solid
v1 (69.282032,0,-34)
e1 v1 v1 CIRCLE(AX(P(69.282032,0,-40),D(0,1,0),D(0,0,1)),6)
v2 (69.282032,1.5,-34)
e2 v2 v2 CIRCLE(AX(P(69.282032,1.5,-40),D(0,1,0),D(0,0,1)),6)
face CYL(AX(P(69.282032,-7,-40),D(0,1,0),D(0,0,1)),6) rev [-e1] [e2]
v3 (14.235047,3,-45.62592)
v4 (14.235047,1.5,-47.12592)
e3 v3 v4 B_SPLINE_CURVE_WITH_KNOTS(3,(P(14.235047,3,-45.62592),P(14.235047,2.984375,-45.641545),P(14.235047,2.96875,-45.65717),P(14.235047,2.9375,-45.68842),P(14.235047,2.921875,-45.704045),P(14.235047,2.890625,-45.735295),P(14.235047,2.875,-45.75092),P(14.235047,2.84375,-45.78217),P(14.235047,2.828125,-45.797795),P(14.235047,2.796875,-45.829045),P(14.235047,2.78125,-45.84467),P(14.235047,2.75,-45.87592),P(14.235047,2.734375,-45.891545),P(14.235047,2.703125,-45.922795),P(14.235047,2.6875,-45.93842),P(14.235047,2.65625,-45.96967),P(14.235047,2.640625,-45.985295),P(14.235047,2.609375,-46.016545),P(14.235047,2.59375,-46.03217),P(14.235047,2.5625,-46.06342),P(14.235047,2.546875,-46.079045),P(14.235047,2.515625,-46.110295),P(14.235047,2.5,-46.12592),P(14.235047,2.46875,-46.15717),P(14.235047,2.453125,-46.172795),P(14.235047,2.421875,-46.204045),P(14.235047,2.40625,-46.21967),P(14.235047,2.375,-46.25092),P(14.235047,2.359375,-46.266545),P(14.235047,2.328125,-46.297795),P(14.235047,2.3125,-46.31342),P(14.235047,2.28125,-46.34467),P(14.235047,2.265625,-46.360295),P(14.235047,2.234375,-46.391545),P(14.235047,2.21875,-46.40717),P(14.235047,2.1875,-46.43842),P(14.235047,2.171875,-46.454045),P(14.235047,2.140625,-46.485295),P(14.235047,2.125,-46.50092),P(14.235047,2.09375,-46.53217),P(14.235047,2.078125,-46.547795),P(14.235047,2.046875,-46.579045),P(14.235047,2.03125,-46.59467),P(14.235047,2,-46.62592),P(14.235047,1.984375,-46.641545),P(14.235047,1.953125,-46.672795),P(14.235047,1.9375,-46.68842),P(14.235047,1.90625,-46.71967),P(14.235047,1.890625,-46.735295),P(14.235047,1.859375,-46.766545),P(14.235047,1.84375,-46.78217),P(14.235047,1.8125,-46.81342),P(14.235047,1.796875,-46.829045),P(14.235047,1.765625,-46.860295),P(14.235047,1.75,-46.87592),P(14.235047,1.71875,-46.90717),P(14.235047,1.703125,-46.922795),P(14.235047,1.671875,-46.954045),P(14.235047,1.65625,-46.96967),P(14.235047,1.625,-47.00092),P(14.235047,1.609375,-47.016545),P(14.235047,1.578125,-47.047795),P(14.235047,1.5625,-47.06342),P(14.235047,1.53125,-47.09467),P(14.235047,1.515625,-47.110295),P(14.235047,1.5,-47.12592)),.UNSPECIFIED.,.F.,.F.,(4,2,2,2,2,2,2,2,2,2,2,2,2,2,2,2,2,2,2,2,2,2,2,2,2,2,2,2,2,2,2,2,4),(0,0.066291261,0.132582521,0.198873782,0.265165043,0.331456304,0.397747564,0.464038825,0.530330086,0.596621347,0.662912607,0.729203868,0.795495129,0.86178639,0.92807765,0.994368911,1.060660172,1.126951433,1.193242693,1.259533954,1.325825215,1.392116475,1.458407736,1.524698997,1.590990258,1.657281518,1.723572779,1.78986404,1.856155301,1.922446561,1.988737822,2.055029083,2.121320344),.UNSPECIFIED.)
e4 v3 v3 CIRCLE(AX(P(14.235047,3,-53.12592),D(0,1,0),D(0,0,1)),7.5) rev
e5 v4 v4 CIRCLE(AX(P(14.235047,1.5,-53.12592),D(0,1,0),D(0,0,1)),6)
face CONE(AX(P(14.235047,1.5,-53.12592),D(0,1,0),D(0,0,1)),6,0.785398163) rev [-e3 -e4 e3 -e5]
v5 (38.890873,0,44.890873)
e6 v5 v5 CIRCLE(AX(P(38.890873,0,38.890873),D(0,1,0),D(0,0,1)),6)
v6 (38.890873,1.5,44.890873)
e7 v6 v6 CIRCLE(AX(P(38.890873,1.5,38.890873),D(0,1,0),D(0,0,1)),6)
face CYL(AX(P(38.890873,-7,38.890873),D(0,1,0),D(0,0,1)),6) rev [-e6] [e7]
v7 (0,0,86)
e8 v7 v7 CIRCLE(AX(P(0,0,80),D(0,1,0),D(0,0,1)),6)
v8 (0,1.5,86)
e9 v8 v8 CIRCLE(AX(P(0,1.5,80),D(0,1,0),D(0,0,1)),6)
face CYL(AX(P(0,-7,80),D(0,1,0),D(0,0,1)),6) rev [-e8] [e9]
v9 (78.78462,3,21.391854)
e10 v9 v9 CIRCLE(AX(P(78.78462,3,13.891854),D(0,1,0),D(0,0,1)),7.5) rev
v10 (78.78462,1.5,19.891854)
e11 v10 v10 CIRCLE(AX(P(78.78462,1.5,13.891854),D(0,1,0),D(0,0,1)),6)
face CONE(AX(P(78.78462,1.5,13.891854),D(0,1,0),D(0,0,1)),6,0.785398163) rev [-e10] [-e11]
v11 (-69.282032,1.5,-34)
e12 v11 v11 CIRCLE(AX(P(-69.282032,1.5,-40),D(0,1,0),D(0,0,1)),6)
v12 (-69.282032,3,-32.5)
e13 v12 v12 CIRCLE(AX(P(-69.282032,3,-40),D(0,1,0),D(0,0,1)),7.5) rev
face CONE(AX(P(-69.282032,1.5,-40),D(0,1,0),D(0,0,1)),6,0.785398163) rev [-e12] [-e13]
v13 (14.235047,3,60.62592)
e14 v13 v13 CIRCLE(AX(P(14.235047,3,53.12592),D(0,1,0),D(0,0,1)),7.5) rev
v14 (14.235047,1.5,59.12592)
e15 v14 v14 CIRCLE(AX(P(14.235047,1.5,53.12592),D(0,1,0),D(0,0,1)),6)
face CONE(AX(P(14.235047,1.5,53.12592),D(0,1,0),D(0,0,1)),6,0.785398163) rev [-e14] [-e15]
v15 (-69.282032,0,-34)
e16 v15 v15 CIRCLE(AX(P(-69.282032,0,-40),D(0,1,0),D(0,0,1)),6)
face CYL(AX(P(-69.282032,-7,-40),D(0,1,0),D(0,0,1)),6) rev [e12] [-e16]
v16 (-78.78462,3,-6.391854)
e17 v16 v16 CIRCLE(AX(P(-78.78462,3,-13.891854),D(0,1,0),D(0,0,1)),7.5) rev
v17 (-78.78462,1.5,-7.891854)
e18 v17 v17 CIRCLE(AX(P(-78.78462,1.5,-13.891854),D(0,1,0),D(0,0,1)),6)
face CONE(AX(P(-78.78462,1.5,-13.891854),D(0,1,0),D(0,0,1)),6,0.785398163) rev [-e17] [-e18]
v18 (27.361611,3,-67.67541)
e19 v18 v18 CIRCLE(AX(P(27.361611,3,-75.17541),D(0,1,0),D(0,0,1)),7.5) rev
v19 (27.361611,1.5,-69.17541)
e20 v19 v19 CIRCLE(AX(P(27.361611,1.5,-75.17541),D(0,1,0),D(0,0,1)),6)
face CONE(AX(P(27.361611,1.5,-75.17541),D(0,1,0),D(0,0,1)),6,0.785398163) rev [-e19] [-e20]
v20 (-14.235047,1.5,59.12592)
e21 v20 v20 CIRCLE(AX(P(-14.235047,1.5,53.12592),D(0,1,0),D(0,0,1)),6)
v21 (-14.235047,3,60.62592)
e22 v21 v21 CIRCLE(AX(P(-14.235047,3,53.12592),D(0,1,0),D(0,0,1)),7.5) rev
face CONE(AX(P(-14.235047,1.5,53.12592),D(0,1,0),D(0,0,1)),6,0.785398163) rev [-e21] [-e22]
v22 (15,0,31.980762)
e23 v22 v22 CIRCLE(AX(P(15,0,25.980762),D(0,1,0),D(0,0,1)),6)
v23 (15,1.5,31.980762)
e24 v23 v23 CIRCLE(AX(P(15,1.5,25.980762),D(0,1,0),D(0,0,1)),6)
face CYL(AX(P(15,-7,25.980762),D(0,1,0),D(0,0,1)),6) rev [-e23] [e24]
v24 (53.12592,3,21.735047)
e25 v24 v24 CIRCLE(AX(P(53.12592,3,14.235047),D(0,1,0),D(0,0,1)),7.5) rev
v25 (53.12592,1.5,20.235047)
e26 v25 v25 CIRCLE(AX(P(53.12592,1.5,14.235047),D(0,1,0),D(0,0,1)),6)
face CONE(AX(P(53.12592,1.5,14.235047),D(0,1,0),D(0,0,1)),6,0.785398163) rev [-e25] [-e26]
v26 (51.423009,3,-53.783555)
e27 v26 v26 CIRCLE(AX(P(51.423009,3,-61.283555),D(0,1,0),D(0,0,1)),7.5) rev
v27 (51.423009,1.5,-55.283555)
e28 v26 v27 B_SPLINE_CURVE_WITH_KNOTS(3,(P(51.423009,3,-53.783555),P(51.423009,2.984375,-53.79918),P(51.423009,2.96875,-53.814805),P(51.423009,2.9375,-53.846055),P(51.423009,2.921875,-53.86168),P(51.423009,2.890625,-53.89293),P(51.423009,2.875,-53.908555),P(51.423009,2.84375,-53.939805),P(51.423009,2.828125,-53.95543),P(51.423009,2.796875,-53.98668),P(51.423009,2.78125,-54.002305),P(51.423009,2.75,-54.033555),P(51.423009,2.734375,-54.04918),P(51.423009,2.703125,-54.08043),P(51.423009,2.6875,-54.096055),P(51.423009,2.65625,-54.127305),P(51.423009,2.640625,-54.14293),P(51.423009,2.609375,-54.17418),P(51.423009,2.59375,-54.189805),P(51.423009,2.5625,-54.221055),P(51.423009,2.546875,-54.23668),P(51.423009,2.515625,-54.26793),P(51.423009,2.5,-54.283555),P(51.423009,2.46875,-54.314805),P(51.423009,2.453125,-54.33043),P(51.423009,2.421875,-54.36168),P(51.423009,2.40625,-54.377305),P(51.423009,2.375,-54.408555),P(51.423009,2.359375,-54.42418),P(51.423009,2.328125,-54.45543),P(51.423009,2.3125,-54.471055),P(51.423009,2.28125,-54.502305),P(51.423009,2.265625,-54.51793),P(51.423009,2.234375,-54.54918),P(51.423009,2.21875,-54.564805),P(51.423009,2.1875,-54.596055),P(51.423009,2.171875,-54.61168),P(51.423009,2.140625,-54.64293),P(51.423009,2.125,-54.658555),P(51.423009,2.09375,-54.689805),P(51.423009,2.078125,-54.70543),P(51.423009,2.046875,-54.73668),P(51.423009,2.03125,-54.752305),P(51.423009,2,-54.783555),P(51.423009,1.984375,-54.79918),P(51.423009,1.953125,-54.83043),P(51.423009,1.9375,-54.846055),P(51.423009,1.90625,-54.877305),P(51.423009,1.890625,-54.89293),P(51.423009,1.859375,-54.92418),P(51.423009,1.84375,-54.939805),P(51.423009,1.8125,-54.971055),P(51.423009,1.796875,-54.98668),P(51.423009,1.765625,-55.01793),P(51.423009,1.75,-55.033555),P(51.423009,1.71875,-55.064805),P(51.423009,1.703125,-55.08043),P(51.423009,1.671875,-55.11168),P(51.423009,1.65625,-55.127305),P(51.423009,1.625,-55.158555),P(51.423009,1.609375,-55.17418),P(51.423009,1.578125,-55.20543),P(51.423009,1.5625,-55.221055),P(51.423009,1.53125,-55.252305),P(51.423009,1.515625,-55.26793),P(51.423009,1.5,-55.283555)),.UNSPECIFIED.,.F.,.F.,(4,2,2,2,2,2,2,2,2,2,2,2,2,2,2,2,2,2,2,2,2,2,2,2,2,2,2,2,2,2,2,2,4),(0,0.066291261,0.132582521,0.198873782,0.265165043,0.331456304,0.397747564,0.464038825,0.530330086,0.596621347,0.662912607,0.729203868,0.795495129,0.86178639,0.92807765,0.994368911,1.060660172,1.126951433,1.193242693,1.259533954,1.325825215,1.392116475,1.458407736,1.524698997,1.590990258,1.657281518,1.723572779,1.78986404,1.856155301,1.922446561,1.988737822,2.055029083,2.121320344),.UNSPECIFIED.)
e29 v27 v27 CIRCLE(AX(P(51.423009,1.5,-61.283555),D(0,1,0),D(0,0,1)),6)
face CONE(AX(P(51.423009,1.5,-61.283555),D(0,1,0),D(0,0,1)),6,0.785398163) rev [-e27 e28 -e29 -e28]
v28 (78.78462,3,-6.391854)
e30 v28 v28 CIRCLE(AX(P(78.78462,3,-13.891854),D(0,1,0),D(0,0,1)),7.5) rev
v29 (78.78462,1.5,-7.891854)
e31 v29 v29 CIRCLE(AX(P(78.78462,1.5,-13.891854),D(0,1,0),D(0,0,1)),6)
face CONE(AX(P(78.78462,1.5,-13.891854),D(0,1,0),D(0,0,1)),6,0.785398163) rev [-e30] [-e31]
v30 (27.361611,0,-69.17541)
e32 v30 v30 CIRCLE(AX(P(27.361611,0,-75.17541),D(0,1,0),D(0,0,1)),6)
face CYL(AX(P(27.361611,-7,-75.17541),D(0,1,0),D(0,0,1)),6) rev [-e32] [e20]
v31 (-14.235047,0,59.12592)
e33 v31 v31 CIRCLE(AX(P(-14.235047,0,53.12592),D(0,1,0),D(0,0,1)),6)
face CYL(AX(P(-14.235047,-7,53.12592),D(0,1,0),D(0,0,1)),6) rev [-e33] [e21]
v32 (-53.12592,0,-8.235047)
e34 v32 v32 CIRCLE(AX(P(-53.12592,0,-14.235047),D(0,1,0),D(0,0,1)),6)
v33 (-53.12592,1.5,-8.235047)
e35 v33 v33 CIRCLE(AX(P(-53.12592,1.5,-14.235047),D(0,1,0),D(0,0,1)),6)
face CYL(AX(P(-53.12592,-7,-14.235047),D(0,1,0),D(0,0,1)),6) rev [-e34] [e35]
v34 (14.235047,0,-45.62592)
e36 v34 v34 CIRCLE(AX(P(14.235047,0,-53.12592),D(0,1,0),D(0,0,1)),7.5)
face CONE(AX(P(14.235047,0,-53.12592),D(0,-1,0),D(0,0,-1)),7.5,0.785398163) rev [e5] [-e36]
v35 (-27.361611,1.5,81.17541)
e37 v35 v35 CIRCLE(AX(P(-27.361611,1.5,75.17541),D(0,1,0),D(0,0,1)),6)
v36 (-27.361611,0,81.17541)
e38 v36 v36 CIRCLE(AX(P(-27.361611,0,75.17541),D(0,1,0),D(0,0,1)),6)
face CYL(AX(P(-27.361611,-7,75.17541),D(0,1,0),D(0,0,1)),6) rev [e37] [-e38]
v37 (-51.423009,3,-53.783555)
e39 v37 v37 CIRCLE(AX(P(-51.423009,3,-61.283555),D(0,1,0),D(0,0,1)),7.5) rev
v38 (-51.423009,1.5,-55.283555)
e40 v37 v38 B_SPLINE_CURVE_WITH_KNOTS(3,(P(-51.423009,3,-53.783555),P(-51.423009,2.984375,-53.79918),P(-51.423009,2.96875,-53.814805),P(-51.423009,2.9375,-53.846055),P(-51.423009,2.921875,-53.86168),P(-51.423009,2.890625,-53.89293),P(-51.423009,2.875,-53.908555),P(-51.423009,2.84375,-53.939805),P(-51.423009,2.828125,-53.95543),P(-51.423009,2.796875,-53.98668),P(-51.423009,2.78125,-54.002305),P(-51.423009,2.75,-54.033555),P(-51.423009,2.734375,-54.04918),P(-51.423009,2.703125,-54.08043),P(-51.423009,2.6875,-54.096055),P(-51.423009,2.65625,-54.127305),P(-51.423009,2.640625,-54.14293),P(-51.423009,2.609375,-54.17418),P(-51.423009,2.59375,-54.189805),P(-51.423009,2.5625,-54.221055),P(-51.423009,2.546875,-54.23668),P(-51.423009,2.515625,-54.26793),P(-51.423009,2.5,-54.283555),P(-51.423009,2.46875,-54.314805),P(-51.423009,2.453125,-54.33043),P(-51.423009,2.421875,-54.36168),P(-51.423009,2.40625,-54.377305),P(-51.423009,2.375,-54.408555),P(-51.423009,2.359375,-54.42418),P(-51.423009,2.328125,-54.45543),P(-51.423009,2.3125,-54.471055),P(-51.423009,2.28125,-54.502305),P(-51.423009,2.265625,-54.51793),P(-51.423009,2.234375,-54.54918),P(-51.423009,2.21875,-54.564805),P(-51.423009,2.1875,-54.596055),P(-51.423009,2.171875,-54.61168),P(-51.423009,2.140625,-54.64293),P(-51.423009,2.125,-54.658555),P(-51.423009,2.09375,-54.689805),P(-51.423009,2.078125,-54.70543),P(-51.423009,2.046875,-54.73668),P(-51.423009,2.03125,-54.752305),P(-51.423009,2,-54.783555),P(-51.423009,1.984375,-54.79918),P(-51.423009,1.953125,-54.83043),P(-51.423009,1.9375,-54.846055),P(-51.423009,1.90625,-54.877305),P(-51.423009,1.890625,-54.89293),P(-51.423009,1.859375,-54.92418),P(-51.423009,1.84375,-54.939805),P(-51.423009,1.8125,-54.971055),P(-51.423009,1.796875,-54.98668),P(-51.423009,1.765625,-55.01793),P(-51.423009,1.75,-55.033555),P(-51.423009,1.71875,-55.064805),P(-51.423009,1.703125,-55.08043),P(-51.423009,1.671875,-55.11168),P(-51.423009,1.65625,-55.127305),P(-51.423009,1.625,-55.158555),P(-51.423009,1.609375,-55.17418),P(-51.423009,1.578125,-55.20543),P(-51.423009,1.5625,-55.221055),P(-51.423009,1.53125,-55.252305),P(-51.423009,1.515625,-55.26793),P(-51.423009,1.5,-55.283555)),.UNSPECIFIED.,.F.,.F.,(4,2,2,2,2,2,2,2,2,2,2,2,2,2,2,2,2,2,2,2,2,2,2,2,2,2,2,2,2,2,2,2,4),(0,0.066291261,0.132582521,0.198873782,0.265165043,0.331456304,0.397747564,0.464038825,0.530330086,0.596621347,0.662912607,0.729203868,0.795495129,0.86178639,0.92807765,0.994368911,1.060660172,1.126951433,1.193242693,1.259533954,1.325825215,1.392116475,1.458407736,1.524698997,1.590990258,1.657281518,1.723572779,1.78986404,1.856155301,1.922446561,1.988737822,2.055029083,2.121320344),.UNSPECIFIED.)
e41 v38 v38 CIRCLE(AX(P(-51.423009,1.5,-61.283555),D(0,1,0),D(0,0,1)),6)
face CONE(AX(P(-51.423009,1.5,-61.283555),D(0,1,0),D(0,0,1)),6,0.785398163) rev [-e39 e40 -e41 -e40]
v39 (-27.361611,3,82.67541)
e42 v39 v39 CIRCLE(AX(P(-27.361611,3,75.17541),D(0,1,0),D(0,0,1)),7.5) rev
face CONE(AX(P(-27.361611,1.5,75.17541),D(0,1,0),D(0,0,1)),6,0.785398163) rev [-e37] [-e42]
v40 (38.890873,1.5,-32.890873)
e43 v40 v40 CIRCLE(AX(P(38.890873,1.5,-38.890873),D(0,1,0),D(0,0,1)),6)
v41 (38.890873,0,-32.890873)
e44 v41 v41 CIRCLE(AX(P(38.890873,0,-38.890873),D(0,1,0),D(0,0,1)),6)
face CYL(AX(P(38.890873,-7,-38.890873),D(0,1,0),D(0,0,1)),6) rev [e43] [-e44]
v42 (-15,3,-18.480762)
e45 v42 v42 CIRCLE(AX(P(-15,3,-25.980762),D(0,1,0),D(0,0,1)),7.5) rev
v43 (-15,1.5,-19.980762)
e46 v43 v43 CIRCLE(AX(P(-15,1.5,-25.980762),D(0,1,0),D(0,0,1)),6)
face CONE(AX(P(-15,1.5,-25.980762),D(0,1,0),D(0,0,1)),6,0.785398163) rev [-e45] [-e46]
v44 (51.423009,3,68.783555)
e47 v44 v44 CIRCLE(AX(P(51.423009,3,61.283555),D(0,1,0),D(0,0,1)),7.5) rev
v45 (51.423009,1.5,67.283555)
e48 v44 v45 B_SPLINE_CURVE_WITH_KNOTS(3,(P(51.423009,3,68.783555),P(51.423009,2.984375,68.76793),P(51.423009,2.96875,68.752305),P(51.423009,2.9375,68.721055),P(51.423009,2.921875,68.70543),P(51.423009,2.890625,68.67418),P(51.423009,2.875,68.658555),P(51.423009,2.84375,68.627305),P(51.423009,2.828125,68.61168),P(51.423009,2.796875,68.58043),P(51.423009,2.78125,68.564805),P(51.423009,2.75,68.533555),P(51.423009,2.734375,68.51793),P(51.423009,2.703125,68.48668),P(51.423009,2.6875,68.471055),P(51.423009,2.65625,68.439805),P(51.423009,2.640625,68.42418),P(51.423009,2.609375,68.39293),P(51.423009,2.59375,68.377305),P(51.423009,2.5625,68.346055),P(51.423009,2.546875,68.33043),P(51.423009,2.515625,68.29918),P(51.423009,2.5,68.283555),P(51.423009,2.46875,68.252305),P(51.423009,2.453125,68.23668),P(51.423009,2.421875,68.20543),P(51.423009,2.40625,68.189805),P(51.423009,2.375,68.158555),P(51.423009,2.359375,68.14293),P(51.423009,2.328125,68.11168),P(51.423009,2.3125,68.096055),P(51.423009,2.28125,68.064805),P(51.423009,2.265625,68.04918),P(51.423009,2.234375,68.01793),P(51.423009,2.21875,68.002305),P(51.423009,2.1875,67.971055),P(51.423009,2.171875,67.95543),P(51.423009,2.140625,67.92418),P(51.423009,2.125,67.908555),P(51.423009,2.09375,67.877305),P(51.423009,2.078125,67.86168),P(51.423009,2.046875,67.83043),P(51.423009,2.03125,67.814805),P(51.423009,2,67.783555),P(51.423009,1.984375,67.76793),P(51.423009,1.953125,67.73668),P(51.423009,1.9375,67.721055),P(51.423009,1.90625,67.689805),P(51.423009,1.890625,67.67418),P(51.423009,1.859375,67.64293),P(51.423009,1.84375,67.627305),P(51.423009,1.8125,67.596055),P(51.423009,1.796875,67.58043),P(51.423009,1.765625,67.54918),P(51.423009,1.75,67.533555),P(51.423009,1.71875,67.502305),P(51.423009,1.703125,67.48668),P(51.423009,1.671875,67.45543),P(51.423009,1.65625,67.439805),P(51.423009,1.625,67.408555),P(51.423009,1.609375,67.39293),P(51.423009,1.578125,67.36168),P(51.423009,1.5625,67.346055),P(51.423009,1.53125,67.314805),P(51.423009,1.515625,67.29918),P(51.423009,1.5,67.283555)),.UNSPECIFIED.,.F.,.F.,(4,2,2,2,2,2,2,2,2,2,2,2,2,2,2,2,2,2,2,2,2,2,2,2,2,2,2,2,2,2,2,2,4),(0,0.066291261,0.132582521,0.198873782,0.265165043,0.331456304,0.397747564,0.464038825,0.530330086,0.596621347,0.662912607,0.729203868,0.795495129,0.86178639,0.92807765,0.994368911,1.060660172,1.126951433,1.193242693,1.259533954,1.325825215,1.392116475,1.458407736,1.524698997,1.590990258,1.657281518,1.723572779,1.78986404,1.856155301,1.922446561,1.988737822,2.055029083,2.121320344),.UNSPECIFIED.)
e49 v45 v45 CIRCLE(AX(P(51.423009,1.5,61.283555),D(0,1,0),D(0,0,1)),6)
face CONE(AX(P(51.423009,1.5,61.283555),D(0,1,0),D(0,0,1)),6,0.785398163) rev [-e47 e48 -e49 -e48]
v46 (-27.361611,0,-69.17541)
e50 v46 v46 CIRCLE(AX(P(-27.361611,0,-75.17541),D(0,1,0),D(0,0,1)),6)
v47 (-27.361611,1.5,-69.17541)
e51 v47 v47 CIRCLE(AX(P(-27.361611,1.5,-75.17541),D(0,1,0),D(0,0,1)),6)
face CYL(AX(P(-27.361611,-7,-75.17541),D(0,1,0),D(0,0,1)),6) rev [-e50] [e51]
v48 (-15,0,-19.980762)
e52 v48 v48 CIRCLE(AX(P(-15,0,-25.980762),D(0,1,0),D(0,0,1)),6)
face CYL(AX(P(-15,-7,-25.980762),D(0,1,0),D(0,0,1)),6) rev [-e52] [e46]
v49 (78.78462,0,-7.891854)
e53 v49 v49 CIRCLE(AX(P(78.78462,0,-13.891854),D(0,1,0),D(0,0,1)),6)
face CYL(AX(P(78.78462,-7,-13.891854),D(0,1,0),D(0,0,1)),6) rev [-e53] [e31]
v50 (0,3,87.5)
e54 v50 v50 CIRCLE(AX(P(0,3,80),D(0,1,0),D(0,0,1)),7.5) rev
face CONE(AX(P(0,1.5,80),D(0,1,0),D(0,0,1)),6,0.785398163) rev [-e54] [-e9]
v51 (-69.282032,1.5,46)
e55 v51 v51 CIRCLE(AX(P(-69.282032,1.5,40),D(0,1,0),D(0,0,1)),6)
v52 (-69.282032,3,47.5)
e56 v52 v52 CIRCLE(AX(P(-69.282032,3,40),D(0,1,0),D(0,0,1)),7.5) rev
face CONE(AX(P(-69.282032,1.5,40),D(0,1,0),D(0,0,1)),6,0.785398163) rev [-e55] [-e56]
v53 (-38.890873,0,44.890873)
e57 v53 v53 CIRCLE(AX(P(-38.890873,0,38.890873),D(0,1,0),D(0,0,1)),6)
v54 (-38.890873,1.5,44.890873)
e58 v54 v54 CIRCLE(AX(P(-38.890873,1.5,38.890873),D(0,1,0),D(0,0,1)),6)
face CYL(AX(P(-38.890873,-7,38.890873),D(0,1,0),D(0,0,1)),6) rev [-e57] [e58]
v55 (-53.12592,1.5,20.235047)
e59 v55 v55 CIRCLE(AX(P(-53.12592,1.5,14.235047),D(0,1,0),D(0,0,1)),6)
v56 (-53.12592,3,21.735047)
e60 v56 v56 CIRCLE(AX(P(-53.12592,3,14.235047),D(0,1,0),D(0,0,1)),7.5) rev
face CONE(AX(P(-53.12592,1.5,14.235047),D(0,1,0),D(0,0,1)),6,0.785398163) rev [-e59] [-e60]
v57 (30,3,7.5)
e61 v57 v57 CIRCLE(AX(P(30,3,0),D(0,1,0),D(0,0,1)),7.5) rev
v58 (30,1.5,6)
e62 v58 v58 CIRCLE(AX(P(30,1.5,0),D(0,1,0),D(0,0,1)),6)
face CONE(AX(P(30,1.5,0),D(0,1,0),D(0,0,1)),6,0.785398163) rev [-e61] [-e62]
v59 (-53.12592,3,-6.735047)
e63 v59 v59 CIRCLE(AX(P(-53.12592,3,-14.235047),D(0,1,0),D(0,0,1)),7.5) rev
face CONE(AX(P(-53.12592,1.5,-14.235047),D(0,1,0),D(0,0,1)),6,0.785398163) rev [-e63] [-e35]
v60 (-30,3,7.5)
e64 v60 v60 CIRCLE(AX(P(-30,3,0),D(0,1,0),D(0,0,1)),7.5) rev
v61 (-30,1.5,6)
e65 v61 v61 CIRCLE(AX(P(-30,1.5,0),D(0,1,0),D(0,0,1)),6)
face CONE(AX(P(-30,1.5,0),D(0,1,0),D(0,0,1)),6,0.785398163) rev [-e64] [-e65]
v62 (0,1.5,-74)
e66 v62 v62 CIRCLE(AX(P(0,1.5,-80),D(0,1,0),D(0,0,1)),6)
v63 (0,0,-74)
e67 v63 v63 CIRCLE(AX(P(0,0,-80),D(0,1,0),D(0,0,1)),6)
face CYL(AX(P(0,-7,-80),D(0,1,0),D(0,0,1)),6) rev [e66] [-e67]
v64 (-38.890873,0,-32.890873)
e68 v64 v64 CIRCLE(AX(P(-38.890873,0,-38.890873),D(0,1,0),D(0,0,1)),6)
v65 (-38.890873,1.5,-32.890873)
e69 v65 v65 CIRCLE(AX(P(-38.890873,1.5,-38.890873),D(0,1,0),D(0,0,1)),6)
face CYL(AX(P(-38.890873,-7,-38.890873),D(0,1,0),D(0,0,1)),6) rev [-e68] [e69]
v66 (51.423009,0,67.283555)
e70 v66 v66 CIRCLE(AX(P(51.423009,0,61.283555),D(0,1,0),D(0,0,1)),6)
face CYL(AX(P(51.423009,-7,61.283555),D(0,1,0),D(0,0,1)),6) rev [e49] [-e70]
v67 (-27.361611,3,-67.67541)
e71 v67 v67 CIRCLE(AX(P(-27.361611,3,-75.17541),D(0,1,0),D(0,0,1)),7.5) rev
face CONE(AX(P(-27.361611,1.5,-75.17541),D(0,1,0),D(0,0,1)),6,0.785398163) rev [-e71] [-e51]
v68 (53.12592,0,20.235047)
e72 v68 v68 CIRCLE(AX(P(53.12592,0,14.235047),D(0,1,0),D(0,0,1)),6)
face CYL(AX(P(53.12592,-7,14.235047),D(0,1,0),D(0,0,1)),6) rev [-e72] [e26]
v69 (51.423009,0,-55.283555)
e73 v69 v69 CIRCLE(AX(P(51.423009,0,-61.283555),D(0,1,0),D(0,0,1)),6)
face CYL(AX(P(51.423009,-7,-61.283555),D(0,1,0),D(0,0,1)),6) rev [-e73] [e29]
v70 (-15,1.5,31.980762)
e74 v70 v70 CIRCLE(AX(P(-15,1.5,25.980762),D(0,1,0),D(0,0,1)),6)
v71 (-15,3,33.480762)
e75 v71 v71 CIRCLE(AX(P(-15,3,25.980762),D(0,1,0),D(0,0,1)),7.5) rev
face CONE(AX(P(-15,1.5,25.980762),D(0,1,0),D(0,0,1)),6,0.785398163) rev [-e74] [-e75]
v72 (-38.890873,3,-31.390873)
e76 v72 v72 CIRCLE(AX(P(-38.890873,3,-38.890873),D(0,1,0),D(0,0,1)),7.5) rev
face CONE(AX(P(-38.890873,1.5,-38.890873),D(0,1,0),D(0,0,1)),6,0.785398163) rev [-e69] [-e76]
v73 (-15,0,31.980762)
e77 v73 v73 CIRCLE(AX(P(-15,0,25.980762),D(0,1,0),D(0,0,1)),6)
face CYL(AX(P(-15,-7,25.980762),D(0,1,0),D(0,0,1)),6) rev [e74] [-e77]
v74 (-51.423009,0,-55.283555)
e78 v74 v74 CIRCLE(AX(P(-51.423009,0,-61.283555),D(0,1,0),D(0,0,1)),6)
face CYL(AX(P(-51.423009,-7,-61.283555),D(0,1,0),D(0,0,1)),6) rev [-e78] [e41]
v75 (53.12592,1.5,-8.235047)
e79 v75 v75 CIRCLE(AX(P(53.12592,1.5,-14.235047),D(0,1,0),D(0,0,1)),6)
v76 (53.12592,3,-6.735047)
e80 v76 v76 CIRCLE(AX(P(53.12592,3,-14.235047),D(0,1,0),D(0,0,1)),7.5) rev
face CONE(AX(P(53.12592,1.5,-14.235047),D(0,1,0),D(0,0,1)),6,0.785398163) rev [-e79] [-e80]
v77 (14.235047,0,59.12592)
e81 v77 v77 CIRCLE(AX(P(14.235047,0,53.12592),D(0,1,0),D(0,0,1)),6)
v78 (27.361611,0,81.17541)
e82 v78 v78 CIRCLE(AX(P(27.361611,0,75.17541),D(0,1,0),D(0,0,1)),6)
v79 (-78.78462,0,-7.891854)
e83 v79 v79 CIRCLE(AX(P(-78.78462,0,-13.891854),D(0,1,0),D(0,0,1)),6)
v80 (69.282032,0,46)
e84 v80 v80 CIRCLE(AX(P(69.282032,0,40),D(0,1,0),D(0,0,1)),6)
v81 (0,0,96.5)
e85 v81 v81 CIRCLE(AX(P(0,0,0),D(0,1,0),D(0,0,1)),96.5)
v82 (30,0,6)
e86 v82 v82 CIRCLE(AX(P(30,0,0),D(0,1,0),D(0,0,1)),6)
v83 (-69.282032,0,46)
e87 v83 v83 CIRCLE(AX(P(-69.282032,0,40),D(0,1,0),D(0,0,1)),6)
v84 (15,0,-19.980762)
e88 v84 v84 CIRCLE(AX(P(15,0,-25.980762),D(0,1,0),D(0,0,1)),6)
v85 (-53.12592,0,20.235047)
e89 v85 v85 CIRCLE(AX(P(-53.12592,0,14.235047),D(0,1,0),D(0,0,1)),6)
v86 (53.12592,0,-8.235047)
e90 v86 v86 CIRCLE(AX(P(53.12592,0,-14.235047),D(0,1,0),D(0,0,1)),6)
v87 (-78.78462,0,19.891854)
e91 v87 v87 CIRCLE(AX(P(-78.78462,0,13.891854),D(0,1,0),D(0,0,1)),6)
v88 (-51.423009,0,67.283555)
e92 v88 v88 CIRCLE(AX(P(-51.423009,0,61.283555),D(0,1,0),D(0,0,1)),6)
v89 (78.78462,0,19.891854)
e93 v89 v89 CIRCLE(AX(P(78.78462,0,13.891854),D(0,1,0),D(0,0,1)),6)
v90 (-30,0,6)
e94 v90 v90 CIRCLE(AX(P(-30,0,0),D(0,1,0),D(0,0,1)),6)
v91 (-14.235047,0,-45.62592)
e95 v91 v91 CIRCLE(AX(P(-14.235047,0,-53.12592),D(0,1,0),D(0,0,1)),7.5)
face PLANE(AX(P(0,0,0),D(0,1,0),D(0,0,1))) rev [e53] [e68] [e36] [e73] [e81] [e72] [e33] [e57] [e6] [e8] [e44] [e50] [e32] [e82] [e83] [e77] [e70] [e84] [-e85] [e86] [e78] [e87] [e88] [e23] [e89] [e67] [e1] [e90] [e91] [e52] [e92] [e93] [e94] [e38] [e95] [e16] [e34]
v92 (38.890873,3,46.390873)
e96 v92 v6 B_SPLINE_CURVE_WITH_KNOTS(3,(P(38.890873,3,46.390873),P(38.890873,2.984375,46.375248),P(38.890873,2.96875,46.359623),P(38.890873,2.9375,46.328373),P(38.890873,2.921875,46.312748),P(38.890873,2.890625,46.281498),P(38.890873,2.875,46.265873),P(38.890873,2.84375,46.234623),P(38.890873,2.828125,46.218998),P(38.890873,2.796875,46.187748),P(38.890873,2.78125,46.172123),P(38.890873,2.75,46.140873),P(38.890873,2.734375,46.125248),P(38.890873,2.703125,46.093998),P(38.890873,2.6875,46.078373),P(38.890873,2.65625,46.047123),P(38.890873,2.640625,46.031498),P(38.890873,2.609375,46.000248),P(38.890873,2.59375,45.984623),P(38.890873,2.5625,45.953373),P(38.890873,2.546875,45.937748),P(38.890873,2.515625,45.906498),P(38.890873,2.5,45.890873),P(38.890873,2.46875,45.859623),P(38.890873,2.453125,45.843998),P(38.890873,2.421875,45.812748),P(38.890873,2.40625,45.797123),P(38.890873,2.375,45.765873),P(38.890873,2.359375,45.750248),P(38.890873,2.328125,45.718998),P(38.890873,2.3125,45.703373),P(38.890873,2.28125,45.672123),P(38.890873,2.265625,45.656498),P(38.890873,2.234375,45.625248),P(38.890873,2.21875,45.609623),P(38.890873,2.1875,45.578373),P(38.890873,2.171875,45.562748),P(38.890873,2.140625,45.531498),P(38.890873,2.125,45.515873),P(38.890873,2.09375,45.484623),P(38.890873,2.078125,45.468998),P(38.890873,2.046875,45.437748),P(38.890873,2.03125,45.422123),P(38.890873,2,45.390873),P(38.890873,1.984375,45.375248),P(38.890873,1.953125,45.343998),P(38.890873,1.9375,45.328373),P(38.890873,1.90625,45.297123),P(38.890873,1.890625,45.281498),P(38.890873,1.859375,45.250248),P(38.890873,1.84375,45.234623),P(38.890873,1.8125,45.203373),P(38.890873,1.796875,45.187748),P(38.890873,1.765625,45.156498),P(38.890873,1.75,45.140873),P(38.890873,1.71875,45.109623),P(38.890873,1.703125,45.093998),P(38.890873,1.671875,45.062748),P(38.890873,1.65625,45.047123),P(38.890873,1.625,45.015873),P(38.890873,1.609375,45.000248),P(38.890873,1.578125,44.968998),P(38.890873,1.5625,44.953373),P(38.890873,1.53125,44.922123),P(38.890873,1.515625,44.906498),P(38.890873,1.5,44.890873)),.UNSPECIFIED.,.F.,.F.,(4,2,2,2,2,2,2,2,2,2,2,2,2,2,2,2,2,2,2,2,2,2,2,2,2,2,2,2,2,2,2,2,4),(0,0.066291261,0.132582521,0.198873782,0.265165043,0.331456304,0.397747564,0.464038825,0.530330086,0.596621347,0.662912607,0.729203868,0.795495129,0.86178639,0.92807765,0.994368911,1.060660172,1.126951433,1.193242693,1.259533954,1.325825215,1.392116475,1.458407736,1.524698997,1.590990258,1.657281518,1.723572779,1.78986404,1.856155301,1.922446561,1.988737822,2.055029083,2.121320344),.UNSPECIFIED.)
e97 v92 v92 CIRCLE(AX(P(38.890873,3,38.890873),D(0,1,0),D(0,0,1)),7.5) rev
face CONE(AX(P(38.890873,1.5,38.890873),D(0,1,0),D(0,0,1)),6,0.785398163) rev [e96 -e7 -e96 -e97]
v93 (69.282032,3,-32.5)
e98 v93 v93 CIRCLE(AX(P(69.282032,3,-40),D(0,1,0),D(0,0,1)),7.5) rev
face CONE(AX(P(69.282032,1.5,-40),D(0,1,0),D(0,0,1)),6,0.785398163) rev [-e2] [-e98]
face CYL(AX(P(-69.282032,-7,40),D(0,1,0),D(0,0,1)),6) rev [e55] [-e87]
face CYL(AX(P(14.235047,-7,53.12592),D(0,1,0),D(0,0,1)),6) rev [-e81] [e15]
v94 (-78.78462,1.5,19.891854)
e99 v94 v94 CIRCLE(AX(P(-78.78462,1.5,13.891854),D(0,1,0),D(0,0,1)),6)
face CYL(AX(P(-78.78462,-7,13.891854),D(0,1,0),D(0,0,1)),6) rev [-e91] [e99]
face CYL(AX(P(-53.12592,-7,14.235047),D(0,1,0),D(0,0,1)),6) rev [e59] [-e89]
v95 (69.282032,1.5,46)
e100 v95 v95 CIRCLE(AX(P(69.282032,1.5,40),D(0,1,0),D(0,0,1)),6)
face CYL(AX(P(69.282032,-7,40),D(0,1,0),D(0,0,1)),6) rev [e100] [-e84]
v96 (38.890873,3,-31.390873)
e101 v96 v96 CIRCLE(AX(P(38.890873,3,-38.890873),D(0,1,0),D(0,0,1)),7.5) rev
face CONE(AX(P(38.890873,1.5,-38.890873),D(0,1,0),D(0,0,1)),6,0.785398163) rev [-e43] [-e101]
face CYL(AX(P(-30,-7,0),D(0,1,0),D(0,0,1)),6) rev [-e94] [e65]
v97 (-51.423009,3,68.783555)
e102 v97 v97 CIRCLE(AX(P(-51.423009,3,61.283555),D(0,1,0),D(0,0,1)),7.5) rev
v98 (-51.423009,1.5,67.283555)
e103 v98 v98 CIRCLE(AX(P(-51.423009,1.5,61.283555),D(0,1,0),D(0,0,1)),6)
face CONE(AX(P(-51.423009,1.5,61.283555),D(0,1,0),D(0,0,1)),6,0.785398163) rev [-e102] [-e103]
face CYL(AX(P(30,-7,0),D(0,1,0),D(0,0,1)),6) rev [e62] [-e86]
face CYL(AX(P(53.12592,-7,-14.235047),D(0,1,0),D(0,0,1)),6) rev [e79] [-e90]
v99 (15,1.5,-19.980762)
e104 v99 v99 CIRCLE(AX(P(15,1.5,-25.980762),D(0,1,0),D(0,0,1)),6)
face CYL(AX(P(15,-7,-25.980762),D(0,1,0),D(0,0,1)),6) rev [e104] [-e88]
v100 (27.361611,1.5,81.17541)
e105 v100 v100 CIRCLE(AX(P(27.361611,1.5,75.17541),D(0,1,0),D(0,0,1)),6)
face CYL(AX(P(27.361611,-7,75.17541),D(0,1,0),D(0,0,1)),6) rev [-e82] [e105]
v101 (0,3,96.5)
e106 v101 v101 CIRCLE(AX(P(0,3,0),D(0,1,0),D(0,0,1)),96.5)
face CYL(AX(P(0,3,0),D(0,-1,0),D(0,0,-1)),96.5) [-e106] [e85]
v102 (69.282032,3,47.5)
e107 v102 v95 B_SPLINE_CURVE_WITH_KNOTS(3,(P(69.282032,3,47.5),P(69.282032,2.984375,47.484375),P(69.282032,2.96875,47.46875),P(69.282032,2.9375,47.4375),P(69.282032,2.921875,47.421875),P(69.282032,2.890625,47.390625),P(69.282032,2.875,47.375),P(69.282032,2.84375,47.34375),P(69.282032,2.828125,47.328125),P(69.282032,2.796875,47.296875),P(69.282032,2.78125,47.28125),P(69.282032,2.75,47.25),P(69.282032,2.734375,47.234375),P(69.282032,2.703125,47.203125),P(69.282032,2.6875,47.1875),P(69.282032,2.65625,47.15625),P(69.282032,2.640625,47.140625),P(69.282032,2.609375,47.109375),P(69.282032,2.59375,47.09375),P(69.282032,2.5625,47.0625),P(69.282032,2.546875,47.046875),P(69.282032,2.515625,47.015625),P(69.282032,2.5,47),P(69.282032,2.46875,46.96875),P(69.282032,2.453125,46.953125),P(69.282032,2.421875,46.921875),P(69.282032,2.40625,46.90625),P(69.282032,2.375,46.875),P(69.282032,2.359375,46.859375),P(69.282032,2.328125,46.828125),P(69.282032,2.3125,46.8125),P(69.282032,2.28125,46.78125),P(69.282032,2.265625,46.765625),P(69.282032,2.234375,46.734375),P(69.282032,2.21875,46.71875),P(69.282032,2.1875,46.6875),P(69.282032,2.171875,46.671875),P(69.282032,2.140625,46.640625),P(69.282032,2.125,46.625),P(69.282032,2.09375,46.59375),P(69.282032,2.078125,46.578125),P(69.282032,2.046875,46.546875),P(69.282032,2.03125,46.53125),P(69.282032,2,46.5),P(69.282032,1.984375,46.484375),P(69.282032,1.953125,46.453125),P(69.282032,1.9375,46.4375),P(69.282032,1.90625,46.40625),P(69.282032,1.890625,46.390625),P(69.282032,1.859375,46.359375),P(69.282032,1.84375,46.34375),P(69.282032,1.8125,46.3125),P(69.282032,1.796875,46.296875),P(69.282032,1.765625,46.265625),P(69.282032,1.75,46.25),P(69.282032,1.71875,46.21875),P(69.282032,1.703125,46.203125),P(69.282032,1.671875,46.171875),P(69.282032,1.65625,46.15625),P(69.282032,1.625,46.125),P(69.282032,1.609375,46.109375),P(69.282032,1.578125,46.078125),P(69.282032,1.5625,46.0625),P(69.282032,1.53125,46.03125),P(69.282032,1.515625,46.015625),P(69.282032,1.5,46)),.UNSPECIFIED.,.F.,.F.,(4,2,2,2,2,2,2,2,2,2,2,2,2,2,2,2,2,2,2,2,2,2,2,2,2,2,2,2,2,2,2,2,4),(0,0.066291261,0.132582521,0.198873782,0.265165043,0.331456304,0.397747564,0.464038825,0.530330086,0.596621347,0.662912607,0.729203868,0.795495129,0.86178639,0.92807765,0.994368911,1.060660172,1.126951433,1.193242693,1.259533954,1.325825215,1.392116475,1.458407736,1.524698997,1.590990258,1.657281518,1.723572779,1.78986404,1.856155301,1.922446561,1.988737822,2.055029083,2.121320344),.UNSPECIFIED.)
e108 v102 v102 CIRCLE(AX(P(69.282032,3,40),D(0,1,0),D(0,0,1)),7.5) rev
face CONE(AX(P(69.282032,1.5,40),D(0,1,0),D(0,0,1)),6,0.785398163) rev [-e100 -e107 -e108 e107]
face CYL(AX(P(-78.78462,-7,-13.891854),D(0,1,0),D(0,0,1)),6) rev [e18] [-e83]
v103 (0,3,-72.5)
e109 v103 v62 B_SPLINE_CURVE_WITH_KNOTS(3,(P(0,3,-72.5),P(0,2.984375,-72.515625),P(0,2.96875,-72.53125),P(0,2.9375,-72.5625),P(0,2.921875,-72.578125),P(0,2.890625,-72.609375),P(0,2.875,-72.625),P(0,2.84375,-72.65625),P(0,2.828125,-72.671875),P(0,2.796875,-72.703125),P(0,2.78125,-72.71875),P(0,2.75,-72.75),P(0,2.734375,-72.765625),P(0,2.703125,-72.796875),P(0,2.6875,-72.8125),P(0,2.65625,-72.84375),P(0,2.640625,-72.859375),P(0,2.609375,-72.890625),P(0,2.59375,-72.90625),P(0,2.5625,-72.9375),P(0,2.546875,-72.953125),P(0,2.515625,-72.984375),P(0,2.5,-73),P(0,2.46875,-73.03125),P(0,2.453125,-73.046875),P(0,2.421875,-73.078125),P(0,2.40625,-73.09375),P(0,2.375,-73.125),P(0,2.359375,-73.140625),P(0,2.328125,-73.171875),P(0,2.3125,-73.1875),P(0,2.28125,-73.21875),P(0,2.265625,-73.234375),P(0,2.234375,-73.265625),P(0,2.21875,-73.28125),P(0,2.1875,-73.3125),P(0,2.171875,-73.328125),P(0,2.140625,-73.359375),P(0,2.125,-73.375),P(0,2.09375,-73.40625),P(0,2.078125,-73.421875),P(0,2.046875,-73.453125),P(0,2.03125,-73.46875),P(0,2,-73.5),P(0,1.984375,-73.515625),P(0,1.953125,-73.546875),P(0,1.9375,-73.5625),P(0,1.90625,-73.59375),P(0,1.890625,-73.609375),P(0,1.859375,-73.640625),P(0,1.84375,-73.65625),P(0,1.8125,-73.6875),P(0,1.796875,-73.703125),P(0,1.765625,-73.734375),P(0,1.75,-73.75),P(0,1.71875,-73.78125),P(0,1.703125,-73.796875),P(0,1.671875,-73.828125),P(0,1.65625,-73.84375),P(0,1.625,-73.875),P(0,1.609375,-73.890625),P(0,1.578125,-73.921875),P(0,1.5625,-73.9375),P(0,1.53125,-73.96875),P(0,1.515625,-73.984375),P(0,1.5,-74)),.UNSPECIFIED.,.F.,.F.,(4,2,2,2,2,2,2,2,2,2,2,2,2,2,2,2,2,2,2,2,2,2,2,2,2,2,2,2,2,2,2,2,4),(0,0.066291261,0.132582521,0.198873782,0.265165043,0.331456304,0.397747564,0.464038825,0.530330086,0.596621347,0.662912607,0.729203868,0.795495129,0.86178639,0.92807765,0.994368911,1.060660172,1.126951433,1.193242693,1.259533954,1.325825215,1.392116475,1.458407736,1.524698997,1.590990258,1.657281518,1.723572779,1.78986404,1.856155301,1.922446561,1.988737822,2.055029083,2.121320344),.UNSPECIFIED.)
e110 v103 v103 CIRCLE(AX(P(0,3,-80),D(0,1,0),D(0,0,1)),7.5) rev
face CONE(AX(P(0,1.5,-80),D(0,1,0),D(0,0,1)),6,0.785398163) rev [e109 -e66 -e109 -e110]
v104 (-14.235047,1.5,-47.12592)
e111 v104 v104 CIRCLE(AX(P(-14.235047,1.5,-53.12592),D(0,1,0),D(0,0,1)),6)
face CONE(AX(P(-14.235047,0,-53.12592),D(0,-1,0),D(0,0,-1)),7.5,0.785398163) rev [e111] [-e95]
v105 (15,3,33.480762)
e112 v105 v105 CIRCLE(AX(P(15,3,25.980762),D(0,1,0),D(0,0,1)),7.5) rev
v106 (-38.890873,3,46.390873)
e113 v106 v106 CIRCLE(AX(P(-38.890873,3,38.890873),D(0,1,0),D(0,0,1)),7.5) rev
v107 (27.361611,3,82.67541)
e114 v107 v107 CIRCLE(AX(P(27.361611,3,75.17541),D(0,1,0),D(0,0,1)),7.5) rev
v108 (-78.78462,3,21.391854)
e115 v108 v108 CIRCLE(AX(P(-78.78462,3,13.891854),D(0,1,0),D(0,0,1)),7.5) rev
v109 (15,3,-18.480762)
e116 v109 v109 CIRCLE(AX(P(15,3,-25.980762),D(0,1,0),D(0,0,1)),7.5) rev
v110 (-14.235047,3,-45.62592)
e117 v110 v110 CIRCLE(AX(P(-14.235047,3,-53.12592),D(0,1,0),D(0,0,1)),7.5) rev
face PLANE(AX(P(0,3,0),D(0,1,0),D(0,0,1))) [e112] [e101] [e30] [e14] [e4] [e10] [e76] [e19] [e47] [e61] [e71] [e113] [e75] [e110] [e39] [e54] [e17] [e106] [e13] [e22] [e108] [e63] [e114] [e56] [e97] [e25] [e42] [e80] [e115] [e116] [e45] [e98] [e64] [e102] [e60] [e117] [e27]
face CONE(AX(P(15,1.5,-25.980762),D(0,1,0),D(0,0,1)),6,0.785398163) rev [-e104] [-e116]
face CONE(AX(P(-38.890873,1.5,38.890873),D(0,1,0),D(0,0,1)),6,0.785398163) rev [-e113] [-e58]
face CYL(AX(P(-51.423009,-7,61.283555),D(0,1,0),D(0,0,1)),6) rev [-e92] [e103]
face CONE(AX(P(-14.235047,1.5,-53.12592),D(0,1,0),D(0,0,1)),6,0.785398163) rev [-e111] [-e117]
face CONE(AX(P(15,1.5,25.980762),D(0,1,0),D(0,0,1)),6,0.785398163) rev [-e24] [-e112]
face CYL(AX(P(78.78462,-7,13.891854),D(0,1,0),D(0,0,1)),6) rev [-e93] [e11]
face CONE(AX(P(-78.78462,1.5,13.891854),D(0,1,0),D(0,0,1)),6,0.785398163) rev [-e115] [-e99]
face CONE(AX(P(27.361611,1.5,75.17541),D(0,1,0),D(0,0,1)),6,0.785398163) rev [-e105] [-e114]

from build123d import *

# Parameters (mm, degrees)
SKETCH1_R           = 96.5
BOSS_EXTRUDE1_DEPTH = 3
SKETCH2_R           = 6
CUT_EXTRUDE3_DEPTH  = 10
CHAMFER3_SIZE       = 1.5


with BuildPart() as part:
    # Sketch1 → Boss-Extrude1 (new body)
    with BuildSketch(Plane(origin=(0, 0, 0), x_dir=(1, 0, 0), z_dir=(0, 1, 0))):
        with Locations(Location((0, 0, 0), (0, 0, 270))):
            Circle(SKETCH1_R)
    extrude(amount=BOSS_EXTRUDE1_DEPTH)

    # Sketch2 → Cut-Extrude3 (cut)
    with BuildSketch(Plane(origin=(0, 3, 0), x_dir=(1, 0, 0), z_dir=(0, 1, 0))):
        with Locations(Location((30, 0, 0), (0, 0, 270))):
            Circle(SKETCH2_R)
        with Locations(Location((53.125920446, 14.235047481, 0), (0, 0, 270))):
            Circle(SKETCH2_R)
        with Locations(Location((78.784620241, 13.891854213, 0), (0, 0, 270))):
            Circle(SKETCH2_R)
        with Locations(Location((15, -25.980762114, 0), (0, 0, 270))):
            Circle(SKETCH2_R)
        with Locations(Location((-15, -25.980762114, 0), (0, 0, 270))):
            Circle(SKETCH2_R)
        with Locations(Location((-30, 0, 0), (0, 0, 270))):
            Circle(SKETCH2_R)
        with Locations(Location((-15, 25.980762114, 0), (0, 0, 270))):
            Circle(SKETCH2_R)
        with Locations(Location((15, 25.980762114, 0), (0, 0, 270))):
            Circle(SKETCH2_R)
        with Locations(Location((53.125920446, -14.235047481, 0), (0, 0, 270))):
            Circle(SKETCH2_R)
        with Locations(Location((38.890872965, -38.890872965, 0), (0, 0, 270))):
            Circle(SKETCH2_R)
        with Locations(Location((14.235047481, -53.125920446, 0), (0, 0, 270))):
            Circle(SKETCH2_R)
        with Locations(Location((-14.235047481, -53.125920446, 0), (0, 0, 270))):
            Circle(SKETCH2_R)
        with Locations(Location((-38.890872965, -38.890872965, 0), (0, 0, 270))):
            Circle(SKETCH2_R)
        with Locations(Location((-53.125920446, -14.235047481, 0), (0, 0, 270))):
            Circle(SKETCH2_R)
        with Locations(Location((-53.125920446, 14.235047481, 0), (0, 0, 270))):
            Circle(SKETCH2_R)
        with Locations(Location((-38.890872965, 38.890872965, 0), (0, 0, 270))):
            Circle(SKETCH2_R)
        with Locations(Location((-14.235047481, 53.125920446, 0), (0, 0, 270))):
            Circle(SKETCH2_R)
        with Locations(Location((14.235047481, 53.125920446, 0), (0, 0, 270))):
            Circle(SKETCH2_R)
        with Locations(Location((38.890872965, 38.890872965, 0), (0, 0, 270))):
            Circle(SKETCH2_R)
        with Locations(Location((78.784620241, -13.891854213, 0), (0, 0, 270))):
            Circle(SKETCH2_R)
        with Locations(Location((69.282032303, -40, 0), (0, 0, 270))):
            Circle(SKETCH2_R)
        with Locations(Location((51.423008775, -61.28355545, 0), (0, 0, 270))):
            Circle(SKETCH2_R)
        with Locations(Location((27.361611466, -75.175409663, 0), (0, 0, 270))):
            Circle(SKETCH2_R)
        with Locations(Location((0, -80, 0), (0, 0, 270))):
            Circle(SKETCH2_R)
        with Locations(Location((-27.361611466, -75.175409663, 0), (0, 0, 270))):
            Circle(SKETCH2_R)
        with Locations(Location((-51.423008775, -61.28355545, 0), (0, 0, 270))):
            Circle(SKETCH2_R)
        with Locations(Location((-69.282032303, -40, 0), (0, 0, 270))):
            Circle(SKETCH2_R)
        with Locations(Location((-78.784620241, -13.891854213, 0), (0, 0, 270))):
            Circle(SKETCH2_R)
        with Locations(Location((-78.784620241, 13.891854213, 0), (0, 0, 270))):
            Circle(SKETCH2_R)
        with Locations(Location((-69.282032303, 40, 0), (0, 0, 270))):
            Circle(SKETCH2_R)
        with Locations(Location((-51.423008775, 61.28355545, 0), (0, 0, 270))):
            Circle(SKETCH2_R)
        with Locations(Location((-27.361611466, 75.175409663, 0), (0, 0, 270))):
            Circle(SKETCH2_R)
        with Locations(Location((0, 80, 0), (0, 0, 270))):
            Circle(SKETCH2_R)
        with Locations(Location((27.361611466, 75.175409663, 0), (0, 0, 270))):
            Circle(SKETCH2_R)
        with Locations(Location((51.423008775, 61.28355545, 0), (0, 0, 270))):
            Circle(SKETCH2_R)
        with Locations(Location((69.282032303, 40, 0), (0, 0, 270))):
            Circle(SKETCH2_R)
    extrude(amount=-CUT_EXTRUDE3_DEPTH, mode=Mode.SUBTRACT)

    # Chamfer3
    chamfer3_edges = [part.edges().sort_by_distance(p)[0] for p in [
        (-15, 3, -31.980762114),
        (-30, 3, -6),
        (-15, 3, 19.980762114),
        (15, 3, 19.980762114),
        (78.784620241, 3, -19.891854213),
        (53.125920446, 3, -20.235047481),
        (38.890872965, 3, 32.890872965),
        (14.235047481, 3, 47.125920446),
        (-14.235047481, 3, 47.125920446),
        (-38.890872965, 3, 32.890872965),
        (-53.125920446, 3, 8.235047481),
        (-53.125920446, 3, -20.235047481),
        (-38.890872965, 3, -44.890872965),
        (-14.235047481, 0, -59.125920446),
        (-14.235047481, 3, -59.125920446),
        (27.361611466, 3, -81.175409663),
        (51.423008775, 3, -67.28355545),
        (69.282032303, 3, -46),
        (30, 3, -6),
        (14.235047481, 0, -59.125920446),
        (14.235047481, 3, -59.125920446),
        (38.890872965, 3, -44.890872965),
        (78.784620241, 3, 7.891854213),
        (69.282032303, 3, 34),
        (51.423008775, 3, 55.28355545),
        (27.361611466, 3, 69.175409663),
        (0, 3, 74),
        (-27.361611466, 3, 69.175409663),
        (-51.423008775, 3, 55.28355545),
        (-69.282032303, 3, 34),
        (-78.784620241, 3, 7.891854213),
        (-78.784620241, 3, -19.891854213),
        (-69.282032303, 3, -46),
        (-51.423008775, 3, -67.28355545),
        (-27.361611466, 3, -81.175409663),
        (0, 3, -86),
        (53.125920446, 3, 8.235047481),
        (15, 3, -31.980762114),
    ]]
    chamfer(chamfer3_edges, length=CHAMFER3_SIZE - 0.0001)  # a hair under: the kernel refuses the full size


solid = part.part
